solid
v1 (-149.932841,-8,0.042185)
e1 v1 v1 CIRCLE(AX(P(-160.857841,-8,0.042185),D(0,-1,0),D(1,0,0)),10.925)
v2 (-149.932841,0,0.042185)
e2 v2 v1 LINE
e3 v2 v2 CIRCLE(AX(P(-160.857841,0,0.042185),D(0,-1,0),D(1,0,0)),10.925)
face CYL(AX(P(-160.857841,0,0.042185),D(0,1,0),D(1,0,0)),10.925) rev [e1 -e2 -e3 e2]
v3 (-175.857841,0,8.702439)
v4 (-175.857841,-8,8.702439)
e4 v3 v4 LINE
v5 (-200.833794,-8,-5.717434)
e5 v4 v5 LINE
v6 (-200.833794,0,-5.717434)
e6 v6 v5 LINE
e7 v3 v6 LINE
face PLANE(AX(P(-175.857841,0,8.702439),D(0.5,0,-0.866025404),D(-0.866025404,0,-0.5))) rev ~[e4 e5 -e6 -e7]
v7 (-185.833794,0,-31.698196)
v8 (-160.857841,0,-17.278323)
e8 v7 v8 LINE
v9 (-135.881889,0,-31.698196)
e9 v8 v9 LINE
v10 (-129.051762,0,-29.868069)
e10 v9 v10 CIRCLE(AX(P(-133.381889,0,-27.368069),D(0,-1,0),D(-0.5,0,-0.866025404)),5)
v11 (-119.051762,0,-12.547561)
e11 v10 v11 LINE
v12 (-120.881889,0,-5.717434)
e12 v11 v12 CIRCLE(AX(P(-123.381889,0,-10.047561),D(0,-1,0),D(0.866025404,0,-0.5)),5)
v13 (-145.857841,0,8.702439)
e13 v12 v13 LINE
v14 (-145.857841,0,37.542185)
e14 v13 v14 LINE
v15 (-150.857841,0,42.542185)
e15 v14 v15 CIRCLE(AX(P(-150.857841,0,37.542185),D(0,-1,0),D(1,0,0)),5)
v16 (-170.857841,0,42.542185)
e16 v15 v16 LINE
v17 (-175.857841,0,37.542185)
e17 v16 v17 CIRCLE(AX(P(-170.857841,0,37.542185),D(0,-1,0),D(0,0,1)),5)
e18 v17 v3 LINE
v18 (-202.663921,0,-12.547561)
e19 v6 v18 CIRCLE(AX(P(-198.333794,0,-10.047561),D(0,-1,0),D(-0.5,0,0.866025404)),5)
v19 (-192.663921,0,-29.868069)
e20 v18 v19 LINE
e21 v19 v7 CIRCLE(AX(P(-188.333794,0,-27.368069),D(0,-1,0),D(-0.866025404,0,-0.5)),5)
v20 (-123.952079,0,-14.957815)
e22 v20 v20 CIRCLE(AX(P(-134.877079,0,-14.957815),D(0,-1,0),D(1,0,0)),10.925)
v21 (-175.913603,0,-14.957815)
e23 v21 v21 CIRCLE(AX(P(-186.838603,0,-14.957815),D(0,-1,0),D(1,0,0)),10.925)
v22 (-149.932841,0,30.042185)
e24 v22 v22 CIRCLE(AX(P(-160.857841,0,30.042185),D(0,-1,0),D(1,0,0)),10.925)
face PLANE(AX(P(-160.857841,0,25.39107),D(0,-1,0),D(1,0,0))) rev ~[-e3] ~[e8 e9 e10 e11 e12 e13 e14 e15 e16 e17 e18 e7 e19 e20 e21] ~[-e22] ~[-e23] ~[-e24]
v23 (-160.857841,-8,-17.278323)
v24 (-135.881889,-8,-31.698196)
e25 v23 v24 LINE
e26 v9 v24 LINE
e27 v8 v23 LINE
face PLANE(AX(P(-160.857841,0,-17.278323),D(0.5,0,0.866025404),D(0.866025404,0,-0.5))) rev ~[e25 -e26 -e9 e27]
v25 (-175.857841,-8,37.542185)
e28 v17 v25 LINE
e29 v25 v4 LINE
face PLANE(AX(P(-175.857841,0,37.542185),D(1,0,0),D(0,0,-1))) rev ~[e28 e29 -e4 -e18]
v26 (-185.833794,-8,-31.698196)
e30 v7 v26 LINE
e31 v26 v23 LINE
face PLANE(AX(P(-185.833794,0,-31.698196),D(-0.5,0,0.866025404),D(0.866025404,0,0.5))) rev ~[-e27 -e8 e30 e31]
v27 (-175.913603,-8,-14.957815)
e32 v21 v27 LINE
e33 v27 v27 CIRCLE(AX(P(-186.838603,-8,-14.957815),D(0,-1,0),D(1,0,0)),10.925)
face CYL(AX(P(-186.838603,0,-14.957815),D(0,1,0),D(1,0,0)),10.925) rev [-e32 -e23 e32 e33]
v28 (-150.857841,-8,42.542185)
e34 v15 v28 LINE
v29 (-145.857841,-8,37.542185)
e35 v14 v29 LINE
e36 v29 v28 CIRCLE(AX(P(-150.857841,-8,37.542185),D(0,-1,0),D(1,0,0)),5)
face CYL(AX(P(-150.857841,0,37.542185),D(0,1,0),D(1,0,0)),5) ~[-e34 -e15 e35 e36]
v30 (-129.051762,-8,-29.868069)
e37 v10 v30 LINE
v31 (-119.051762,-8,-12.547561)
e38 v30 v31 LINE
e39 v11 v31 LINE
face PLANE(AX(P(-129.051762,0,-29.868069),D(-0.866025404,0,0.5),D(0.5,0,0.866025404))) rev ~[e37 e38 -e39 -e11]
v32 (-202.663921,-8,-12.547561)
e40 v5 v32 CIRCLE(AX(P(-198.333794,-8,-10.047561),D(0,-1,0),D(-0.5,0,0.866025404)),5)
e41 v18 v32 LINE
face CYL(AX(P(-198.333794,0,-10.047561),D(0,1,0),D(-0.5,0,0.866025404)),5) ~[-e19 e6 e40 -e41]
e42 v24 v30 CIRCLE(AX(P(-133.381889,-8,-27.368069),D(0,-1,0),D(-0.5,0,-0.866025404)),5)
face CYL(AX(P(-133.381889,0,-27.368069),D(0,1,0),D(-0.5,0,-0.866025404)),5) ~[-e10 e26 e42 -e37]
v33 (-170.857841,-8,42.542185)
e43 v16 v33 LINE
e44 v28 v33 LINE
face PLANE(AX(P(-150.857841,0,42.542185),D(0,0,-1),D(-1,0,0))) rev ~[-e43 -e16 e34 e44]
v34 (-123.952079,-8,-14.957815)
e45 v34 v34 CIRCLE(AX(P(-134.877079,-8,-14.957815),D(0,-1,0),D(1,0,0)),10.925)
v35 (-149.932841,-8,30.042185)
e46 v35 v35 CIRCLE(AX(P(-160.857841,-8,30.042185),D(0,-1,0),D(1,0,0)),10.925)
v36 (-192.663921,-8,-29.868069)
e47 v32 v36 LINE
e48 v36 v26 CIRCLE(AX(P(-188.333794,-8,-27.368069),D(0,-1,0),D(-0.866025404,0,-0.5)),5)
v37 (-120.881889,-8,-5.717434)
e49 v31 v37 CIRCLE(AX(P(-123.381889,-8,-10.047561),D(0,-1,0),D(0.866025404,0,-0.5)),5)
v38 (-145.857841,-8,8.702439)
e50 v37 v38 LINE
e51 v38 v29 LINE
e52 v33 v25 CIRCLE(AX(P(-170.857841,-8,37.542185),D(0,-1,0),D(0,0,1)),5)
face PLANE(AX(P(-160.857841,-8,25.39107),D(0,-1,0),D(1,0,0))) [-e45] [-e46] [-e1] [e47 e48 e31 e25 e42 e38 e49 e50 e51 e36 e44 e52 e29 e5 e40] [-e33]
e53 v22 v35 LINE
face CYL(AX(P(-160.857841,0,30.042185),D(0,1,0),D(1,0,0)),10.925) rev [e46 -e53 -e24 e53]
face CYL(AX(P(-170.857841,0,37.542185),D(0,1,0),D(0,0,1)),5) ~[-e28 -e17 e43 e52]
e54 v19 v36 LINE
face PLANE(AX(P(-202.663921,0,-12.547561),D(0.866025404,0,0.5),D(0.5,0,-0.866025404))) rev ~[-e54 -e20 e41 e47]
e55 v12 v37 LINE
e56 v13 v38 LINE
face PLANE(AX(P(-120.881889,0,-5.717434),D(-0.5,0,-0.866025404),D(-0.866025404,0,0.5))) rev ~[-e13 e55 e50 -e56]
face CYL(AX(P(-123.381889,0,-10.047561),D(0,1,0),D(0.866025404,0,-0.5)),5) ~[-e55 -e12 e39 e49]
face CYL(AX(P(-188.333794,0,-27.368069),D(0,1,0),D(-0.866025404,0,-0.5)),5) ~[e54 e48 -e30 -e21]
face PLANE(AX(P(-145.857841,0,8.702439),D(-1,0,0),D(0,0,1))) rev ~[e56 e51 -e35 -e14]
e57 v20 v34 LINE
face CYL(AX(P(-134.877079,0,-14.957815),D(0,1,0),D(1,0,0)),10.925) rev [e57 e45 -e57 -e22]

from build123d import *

# Parameters (mm, degrees)
F0_R     = 10.925
F1_DEPTH = 8


with BuildPart() as f1:
    # F0 (on Front) → F1 (new body)
    with BuildSketch(Plane.XZ):
        with BuildLine():
            ThreePointArc((-145.8578413725, 37.5421847403), (-147.3223074666, 41.0777186462), (-150.8578413725, 42.5421847403))
            Line((-150.8578413725, 42.5421847403), (-170.8578413725, 42.5421847403))
            ThreePointArc((-170.8578413725, 42.5421847403), (-174.3933752784, 41.0777186462), (-175.8578413725, 37.5421847403))
            Line((-175.8578413725, 37.5421847403), (-175.8578413725, 8.7024387781))
            Line((-175.8578413725, 8.7024387781), (-167.5084764671, 13.5229468538))
            Line((-167.5084764671, 13.5229468538), (-164.1831589198, 19.2825657971))
            Line((-164.1831589198, 19.2825657971), (-160.8578413725, 17.362692816))
            Line((-160.8578413725, 17.362692816), (-157.5325238252, 19.2825657971))
            Line((-157.5325238252, 19.2825657971), (-154.2072062779, 13.5229468538))
            Line((-154.2072062779, 13.5229468538), (-145.8578413725, 8.7024387781))
            Line((-145.8578413725, 8.7024387781), (-145.8578413725, 37.5421847403))
        make_face()
        with Locations((-160.8578413725, 30.0421847403)):
            Circle(F0_R, mode=Mode.SUBTRACT)
        with BuildLine():
            Line((-120.8818887306, -5.7174342029), (-145.8578413725, 8.7024387781))
            Line((-145.8578413725, 8.7024387781), (-145.8578413725, -0.9385773732))
            Line((-145.8578413725, -0.9385773732), (-142.5325238252, -6.6981963165))
            Line((-142.5325238252, -6.6981963165), (-145.8578413725, -8.6180692975))
            Line((-145.8578413725, -8.6180692975), (-145.8578413725, -12.4578152597))
            Line((-145.8578413725, -12.4578152597), (-152.5084764671, -12.4578152597))
            Line((-152.5084764671, -12.4578152597), (-160.8578413725, -17.2783233354))
            Line((-160.8578413725, -17.2783233354), (-135.8818887306, -31.6981963165))
            ThreePointArc((-135.8818887306, -31.6981963165), (-132.0877935051, -32.197698429), (-129.0517617117, -29.8680692975))
            Line((-129.0517617117, -29.8680692975), (-119.0517617117, -12.5475612219))
            ThreePointArc((-119.0517617117, -12.5475612219), (-118.5522595991, -8.7534659963), (-120.8818887306, -5.7174342029))
        make_face()
        with Locations((-134.877079259, -14.9578152597)):
            Circle(F0_R, mode=Mode.SUBTRACT)
        Polygon((-145.8578413725, -0.9385773732), (-145.8578413725, 8.7024387781), (-154.2072062779, 13.5229468538), align=None)
        Polygon((-167.5084764671, 13.5229468538), (-175.8578413725, 8.7024387781), (-175.8578413725, -0.9385773732), align=None)
        with BuildLine():
            Line((-175.8578413725, -0.9385773732), (-175.8578413725, 8.7024387781))
            Line((-175.8578413725, 8.7024387781), (-200.8337940144, -5.7174342029))
            ThreePointArc((-200.8337940144, -5.7174342029), (-203.1634231459, -8.7534659963), (-202.6639210333, -12.5475612219))
            Line((-202.6639210333, -12.5475612219), (-192.6639210333, -29.8680692975))
            ThreePointArc((-192.6639210333, -29.8680692975), (-189.6278892399, -32.197698429), (-185.8337940144, -31.6981963165))
            Line((-185.8337940144, -31.6981963165), (-160.8578413725, -17.2783233354))
            Line((-160.8578413725, -17.2783233354), (-169.2072062779, -12.4578152597))
            Line((-169.2072062779, -12.4578152597), (-175.8578413725, -12.4578152597))
            Line((-175.8578413725, -12.4578152597), (-175.8578413725, -8.6180692975))
            Line((-175.8578413725, -8.6180692975), (-179.1831589198, -6.6981963165))
            Line((-179.1831589198, -6.6981963165), (-175.8578413725, -0.9385773732))
        make_face()
        with Locations((-186.838603486, -14.9578152597)):
            Circle(F0_R, mode=Mode.SUBTRACT)
        Polygon((-160.8578413725, -17.2783233354), (-152.5084764671, -12.4578152597), (-169.2072062779, -12.4578152597), align=None)
        Polygon((-145.8578413725, -8.6180692975), (-145.8578413725, -0.9385773732), (-154.2072062779, 13.5229468538), (-160.8578413725, 17.362692816), (-167.5084764671, 13.5229468538), (-175.8578413725, -0.9385773732), (-175.8578413725, -8.6180692975), (-169.2072062779, -12.4578152597), (-152.5084764671, -12.4578152597), align=None)
        with Locations((-160.8578413725, 0.0421847403)):
            Circle(F0_R, mode=Mode.SUBTRACT)
        Polygon((-142.5325238252, -6.6981963165), (-145.8578413725, -0.9385773732), (-145.8578413725, -8.6180692975), align=None)
        Polygon((-145.8578413725, -12.4578152597), (-145.8578413725, -8.6180692975), (-152.5084764671, -12.4578152597), align=None)
        Polygon((-169.2072062779, -12.4578152597), (-175.8578413725, -8.6180692975), (-175.8578413725, -12.4578152597), align=None)
        Polygon((-175.8578413725, -8.6180692975), (-175.8578413725, -0.9385773732), (-179.1831589198, -6.6981963165), align=None)
        Polygon((-164.1831589198, 19.2825657971), (-167.5084764671, 13.5229468538), (-160.8578413725, 17.362692816), align=None)
        Polygon((-160.8578413725, 17.362692816), (-154.2072062779, 13.5229468538), (-157.5325238252, 19.2825657971), align=None)
    extrude(amount=F1_DEPTH)


solid = f1.part
